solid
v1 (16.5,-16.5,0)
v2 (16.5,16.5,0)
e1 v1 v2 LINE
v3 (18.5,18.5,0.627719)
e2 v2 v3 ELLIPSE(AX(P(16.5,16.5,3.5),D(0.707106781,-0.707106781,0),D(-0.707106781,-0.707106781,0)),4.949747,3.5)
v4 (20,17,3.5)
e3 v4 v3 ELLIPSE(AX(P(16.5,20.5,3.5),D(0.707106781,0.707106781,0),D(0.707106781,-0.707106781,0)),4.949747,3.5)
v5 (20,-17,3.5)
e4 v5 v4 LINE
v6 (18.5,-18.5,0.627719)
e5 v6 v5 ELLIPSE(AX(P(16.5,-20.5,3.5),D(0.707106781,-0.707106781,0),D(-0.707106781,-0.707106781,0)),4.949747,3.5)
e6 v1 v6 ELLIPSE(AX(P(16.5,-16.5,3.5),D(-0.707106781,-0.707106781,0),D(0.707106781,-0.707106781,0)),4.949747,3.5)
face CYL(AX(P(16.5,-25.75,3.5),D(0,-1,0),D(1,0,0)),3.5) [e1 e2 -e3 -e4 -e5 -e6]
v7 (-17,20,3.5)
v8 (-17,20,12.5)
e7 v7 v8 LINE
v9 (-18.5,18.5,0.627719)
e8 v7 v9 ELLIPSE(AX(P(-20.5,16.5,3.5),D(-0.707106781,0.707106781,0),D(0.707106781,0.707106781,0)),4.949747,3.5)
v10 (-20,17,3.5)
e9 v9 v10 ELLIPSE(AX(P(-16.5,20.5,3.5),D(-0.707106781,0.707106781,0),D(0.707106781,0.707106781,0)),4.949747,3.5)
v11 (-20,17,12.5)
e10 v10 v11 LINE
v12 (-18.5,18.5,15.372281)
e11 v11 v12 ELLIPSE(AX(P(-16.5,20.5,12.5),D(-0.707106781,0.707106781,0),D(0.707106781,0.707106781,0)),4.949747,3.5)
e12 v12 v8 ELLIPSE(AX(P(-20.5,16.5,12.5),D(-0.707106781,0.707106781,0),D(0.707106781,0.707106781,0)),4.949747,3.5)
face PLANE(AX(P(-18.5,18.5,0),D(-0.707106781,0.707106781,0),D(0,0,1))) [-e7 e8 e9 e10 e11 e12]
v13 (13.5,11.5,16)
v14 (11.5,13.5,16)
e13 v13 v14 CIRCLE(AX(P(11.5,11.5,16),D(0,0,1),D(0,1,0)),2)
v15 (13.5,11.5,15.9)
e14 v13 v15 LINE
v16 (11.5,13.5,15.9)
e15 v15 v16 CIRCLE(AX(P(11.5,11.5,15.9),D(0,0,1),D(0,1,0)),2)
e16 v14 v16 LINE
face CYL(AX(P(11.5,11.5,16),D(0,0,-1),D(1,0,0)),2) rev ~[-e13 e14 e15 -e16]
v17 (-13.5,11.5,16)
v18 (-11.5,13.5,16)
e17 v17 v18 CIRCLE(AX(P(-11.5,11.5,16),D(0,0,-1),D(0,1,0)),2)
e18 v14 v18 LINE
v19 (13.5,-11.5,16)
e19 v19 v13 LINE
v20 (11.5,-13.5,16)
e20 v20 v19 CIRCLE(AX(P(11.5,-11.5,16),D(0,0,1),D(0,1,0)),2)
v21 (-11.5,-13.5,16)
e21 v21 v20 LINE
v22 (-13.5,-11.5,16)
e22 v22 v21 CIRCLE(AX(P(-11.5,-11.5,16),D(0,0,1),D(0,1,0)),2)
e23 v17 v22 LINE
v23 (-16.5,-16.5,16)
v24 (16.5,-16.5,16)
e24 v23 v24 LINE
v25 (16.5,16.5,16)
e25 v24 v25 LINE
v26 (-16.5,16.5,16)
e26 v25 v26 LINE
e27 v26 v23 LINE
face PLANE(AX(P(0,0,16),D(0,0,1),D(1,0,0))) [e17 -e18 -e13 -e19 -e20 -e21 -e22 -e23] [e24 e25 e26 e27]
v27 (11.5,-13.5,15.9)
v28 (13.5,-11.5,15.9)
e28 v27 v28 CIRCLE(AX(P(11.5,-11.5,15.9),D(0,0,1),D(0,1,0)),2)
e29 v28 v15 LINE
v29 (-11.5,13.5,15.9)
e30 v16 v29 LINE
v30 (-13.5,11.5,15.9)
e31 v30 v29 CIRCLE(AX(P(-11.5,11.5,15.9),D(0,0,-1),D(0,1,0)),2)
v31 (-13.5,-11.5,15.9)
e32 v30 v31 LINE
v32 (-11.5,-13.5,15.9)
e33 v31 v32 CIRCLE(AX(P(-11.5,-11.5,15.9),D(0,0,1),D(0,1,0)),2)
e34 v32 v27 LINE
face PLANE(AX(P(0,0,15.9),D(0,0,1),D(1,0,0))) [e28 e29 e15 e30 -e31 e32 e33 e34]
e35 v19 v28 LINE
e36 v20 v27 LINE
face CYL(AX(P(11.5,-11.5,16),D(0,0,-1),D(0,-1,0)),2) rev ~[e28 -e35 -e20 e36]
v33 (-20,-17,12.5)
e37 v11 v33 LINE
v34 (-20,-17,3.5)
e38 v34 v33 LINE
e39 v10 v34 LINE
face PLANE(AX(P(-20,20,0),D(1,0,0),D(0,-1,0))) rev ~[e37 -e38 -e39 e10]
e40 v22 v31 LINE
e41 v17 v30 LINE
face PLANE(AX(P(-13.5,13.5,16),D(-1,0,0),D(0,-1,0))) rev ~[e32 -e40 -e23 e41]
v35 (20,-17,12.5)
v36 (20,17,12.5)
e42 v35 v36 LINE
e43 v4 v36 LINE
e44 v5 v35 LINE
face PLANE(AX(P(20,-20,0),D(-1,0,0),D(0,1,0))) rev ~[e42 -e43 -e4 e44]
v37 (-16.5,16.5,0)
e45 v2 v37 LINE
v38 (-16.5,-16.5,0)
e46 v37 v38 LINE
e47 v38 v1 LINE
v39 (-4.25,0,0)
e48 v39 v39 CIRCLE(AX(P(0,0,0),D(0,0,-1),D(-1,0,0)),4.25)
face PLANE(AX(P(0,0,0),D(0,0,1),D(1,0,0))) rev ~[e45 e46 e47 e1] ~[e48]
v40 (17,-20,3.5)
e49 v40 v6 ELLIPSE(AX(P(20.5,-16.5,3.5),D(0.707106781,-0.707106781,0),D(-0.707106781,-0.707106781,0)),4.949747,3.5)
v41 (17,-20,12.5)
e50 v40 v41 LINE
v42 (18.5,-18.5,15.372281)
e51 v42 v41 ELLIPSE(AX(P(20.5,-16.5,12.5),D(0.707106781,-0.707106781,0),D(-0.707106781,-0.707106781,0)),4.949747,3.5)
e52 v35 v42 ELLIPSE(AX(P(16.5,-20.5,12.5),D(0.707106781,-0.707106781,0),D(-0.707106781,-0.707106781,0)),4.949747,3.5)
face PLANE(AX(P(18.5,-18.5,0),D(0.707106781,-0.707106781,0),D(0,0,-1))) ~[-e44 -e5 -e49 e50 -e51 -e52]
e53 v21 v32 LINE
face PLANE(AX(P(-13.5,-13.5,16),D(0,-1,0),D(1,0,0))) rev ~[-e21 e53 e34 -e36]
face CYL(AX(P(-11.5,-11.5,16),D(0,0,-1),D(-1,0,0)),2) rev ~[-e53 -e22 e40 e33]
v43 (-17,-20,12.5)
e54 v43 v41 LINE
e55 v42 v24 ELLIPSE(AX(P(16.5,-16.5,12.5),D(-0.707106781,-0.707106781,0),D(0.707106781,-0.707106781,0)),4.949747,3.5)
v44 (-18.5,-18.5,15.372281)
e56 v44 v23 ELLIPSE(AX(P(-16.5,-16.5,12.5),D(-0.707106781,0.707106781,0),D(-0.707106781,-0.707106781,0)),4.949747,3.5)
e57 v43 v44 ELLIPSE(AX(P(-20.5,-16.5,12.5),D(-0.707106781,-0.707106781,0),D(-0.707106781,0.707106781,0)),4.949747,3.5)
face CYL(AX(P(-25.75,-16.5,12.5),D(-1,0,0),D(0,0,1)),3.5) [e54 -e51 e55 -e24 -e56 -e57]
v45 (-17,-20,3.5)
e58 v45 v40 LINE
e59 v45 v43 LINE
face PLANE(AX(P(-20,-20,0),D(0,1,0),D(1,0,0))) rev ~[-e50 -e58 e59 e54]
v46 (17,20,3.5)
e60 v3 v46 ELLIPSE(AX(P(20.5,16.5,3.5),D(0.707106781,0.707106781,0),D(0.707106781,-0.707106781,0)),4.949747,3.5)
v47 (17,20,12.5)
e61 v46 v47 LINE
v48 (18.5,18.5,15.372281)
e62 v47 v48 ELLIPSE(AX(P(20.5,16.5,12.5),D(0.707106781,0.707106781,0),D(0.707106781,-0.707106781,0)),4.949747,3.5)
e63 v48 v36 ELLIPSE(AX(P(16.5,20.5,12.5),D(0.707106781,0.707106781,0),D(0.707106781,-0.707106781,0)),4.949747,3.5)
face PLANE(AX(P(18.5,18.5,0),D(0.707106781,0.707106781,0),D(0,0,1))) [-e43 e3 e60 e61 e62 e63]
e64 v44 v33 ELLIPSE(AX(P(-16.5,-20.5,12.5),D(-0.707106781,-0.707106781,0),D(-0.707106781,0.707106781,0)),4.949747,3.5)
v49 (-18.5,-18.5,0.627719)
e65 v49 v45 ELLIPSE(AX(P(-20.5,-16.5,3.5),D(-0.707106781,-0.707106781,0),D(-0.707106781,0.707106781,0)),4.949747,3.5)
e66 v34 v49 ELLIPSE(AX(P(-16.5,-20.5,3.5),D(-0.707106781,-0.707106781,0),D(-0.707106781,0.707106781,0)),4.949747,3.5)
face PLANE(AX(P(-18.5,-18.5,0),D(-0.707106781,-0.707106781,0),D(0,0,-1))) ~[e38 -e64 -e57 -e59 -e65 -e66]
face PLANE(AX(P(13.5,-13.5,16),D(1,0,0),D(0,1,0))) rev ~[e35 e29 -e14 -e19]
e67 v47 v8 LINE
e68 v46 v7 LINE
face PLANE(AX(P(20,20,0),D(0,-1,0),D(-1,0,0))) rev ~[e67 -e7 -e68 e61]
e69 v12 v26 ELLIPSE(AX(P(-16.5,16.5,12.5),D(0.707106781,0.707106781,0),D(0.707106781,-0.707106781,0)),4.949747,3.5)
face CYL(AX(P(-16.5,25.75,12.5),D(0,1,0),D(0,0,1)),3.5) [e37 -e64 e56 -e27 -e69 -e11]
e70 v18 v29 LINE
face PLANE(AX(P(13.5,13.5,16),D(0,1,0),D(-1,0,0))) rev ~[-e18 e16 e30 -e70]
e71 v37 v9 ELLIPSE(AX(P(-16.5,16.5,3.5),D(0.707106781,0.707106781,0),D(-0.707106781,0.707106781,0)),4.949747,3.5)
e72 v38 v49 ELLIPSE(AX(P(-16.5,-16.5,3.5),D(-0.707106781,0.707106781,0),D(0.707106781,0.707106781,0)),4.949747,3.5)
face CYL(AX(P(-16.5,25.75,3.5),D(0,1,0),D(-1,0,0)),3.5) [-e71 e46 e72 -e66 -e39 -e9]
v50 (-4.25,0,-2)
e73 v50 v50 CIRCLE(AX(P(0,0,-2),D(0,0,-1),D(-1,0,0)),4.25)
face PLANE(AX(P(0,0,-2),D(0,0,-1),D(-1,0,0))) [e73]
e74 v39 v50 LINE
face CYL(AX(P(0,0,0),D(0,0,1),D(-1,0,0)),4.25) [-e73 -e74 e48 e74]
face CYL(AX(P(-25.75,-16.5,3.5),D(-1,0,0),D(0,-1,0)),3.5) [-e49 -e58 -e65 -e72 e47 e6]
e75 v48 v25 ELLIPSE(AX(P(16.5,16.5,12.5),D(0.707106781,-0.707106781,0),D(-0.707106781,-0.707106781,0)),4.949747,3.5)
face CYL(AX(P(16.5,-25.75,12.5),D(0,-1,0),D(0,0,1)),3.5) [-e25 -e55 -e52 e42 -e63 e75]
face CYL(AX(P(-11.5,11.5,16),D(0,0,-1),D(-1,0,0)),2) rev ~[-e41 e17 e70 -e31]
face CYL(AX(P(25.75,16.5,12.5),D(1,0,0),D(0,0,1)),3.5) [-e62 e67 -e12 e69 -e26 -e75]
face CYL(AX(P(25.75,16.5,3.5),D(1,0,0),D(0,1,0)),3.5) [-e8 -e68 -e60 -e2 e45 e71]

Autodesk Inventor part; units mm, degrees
ref_plane "YZ Plane" through (0, 0, 0) normal (1, 0, 0) x (0, 1, 0)
ref_plane "XZ Plane" through (0, 0, 0) normal (0, 1, 0) x (-1, 0, 0)
ref_plane "XY Plane" through (0, 0, 0) normal (0, 0, 1) x (1, 0, 0)
sketch "Sketch1" plane through (0, 0, 0) normal (0, 0, 1) x (1, 0, 0)
  line L0 (-20, -20) -> (20, -20)
  line L1 (20, -20) -> (20, 20)
  line L2 (20, 20) -> (-20, 20)
  line L3 (-20, 20) -> (-20, -20)
  line L4 (-20, -20) -> (20, 20) construction
  line L5 (20, -20) -> (-20, 20) construction
  point P0 (0, 0)
  dimension "d0" = 40
  dimension "d1" = 40
extrude "Extrusion1" add sketch "Sketch1" along normal blind 16
sketch "Sketch2" plane through (0, 0, 16) normal (0, 0, 1) x (1, 0, 0)
  line L0 (-13.5, -13.5) -> (13.5, -13.5)
  line L1 (13.5, -13.5) -> (13.5, 13.5)
  line L2 (13.5, 13.5) -> (-13.5, 13.5)
  line L3 (-13.5, 13.5) -> (-13.5, -13.5)
  line L4 (-13.5, -13.5) -> (13.5, 13.5) construction
  line L5 (13.5, -13.5) -> (-13.5, 13.5) construction
  point P0 (0, 0)
  dimension "d7" = 27
  dimension "d8" = 27
extrude "Extrusion2" cut sketch "Sketch2" against normal blind 0.1
fillet "Fillet1" radius 2 4 edges at (-13.5, 13.5, 15.95) (13.5, 13.5, 15.95) (13.5, -13.5, 15.95) (-13.5, -13.5, 15.95)
chamfer "Chamfer1" distance 3 angle 45 4 edges at (20, 20, 8) (20, -20, 8) (-20, -20, 8) (-20, 20, 8)
fillet "Fillet2" radius 3.5 8 edges at (20, 0, 16) (0, 20, 16) (0, -20, 16) (-20, 0, 16) (-20, 0, 0) (20, 0, 0) (0, 20, 0) (0, -20, 0)
sketch "Sketch3" plane through (0, 0, 0) normal (0, 0, -1) x (-1, 0, 0)
  circle A0 centre (0, 0) radius 4.25
  dimension "d13" = 8.5
extrude "Extrusion3" add sketch "Sketch3" along normal blind 2
properties part number "LED Light"
